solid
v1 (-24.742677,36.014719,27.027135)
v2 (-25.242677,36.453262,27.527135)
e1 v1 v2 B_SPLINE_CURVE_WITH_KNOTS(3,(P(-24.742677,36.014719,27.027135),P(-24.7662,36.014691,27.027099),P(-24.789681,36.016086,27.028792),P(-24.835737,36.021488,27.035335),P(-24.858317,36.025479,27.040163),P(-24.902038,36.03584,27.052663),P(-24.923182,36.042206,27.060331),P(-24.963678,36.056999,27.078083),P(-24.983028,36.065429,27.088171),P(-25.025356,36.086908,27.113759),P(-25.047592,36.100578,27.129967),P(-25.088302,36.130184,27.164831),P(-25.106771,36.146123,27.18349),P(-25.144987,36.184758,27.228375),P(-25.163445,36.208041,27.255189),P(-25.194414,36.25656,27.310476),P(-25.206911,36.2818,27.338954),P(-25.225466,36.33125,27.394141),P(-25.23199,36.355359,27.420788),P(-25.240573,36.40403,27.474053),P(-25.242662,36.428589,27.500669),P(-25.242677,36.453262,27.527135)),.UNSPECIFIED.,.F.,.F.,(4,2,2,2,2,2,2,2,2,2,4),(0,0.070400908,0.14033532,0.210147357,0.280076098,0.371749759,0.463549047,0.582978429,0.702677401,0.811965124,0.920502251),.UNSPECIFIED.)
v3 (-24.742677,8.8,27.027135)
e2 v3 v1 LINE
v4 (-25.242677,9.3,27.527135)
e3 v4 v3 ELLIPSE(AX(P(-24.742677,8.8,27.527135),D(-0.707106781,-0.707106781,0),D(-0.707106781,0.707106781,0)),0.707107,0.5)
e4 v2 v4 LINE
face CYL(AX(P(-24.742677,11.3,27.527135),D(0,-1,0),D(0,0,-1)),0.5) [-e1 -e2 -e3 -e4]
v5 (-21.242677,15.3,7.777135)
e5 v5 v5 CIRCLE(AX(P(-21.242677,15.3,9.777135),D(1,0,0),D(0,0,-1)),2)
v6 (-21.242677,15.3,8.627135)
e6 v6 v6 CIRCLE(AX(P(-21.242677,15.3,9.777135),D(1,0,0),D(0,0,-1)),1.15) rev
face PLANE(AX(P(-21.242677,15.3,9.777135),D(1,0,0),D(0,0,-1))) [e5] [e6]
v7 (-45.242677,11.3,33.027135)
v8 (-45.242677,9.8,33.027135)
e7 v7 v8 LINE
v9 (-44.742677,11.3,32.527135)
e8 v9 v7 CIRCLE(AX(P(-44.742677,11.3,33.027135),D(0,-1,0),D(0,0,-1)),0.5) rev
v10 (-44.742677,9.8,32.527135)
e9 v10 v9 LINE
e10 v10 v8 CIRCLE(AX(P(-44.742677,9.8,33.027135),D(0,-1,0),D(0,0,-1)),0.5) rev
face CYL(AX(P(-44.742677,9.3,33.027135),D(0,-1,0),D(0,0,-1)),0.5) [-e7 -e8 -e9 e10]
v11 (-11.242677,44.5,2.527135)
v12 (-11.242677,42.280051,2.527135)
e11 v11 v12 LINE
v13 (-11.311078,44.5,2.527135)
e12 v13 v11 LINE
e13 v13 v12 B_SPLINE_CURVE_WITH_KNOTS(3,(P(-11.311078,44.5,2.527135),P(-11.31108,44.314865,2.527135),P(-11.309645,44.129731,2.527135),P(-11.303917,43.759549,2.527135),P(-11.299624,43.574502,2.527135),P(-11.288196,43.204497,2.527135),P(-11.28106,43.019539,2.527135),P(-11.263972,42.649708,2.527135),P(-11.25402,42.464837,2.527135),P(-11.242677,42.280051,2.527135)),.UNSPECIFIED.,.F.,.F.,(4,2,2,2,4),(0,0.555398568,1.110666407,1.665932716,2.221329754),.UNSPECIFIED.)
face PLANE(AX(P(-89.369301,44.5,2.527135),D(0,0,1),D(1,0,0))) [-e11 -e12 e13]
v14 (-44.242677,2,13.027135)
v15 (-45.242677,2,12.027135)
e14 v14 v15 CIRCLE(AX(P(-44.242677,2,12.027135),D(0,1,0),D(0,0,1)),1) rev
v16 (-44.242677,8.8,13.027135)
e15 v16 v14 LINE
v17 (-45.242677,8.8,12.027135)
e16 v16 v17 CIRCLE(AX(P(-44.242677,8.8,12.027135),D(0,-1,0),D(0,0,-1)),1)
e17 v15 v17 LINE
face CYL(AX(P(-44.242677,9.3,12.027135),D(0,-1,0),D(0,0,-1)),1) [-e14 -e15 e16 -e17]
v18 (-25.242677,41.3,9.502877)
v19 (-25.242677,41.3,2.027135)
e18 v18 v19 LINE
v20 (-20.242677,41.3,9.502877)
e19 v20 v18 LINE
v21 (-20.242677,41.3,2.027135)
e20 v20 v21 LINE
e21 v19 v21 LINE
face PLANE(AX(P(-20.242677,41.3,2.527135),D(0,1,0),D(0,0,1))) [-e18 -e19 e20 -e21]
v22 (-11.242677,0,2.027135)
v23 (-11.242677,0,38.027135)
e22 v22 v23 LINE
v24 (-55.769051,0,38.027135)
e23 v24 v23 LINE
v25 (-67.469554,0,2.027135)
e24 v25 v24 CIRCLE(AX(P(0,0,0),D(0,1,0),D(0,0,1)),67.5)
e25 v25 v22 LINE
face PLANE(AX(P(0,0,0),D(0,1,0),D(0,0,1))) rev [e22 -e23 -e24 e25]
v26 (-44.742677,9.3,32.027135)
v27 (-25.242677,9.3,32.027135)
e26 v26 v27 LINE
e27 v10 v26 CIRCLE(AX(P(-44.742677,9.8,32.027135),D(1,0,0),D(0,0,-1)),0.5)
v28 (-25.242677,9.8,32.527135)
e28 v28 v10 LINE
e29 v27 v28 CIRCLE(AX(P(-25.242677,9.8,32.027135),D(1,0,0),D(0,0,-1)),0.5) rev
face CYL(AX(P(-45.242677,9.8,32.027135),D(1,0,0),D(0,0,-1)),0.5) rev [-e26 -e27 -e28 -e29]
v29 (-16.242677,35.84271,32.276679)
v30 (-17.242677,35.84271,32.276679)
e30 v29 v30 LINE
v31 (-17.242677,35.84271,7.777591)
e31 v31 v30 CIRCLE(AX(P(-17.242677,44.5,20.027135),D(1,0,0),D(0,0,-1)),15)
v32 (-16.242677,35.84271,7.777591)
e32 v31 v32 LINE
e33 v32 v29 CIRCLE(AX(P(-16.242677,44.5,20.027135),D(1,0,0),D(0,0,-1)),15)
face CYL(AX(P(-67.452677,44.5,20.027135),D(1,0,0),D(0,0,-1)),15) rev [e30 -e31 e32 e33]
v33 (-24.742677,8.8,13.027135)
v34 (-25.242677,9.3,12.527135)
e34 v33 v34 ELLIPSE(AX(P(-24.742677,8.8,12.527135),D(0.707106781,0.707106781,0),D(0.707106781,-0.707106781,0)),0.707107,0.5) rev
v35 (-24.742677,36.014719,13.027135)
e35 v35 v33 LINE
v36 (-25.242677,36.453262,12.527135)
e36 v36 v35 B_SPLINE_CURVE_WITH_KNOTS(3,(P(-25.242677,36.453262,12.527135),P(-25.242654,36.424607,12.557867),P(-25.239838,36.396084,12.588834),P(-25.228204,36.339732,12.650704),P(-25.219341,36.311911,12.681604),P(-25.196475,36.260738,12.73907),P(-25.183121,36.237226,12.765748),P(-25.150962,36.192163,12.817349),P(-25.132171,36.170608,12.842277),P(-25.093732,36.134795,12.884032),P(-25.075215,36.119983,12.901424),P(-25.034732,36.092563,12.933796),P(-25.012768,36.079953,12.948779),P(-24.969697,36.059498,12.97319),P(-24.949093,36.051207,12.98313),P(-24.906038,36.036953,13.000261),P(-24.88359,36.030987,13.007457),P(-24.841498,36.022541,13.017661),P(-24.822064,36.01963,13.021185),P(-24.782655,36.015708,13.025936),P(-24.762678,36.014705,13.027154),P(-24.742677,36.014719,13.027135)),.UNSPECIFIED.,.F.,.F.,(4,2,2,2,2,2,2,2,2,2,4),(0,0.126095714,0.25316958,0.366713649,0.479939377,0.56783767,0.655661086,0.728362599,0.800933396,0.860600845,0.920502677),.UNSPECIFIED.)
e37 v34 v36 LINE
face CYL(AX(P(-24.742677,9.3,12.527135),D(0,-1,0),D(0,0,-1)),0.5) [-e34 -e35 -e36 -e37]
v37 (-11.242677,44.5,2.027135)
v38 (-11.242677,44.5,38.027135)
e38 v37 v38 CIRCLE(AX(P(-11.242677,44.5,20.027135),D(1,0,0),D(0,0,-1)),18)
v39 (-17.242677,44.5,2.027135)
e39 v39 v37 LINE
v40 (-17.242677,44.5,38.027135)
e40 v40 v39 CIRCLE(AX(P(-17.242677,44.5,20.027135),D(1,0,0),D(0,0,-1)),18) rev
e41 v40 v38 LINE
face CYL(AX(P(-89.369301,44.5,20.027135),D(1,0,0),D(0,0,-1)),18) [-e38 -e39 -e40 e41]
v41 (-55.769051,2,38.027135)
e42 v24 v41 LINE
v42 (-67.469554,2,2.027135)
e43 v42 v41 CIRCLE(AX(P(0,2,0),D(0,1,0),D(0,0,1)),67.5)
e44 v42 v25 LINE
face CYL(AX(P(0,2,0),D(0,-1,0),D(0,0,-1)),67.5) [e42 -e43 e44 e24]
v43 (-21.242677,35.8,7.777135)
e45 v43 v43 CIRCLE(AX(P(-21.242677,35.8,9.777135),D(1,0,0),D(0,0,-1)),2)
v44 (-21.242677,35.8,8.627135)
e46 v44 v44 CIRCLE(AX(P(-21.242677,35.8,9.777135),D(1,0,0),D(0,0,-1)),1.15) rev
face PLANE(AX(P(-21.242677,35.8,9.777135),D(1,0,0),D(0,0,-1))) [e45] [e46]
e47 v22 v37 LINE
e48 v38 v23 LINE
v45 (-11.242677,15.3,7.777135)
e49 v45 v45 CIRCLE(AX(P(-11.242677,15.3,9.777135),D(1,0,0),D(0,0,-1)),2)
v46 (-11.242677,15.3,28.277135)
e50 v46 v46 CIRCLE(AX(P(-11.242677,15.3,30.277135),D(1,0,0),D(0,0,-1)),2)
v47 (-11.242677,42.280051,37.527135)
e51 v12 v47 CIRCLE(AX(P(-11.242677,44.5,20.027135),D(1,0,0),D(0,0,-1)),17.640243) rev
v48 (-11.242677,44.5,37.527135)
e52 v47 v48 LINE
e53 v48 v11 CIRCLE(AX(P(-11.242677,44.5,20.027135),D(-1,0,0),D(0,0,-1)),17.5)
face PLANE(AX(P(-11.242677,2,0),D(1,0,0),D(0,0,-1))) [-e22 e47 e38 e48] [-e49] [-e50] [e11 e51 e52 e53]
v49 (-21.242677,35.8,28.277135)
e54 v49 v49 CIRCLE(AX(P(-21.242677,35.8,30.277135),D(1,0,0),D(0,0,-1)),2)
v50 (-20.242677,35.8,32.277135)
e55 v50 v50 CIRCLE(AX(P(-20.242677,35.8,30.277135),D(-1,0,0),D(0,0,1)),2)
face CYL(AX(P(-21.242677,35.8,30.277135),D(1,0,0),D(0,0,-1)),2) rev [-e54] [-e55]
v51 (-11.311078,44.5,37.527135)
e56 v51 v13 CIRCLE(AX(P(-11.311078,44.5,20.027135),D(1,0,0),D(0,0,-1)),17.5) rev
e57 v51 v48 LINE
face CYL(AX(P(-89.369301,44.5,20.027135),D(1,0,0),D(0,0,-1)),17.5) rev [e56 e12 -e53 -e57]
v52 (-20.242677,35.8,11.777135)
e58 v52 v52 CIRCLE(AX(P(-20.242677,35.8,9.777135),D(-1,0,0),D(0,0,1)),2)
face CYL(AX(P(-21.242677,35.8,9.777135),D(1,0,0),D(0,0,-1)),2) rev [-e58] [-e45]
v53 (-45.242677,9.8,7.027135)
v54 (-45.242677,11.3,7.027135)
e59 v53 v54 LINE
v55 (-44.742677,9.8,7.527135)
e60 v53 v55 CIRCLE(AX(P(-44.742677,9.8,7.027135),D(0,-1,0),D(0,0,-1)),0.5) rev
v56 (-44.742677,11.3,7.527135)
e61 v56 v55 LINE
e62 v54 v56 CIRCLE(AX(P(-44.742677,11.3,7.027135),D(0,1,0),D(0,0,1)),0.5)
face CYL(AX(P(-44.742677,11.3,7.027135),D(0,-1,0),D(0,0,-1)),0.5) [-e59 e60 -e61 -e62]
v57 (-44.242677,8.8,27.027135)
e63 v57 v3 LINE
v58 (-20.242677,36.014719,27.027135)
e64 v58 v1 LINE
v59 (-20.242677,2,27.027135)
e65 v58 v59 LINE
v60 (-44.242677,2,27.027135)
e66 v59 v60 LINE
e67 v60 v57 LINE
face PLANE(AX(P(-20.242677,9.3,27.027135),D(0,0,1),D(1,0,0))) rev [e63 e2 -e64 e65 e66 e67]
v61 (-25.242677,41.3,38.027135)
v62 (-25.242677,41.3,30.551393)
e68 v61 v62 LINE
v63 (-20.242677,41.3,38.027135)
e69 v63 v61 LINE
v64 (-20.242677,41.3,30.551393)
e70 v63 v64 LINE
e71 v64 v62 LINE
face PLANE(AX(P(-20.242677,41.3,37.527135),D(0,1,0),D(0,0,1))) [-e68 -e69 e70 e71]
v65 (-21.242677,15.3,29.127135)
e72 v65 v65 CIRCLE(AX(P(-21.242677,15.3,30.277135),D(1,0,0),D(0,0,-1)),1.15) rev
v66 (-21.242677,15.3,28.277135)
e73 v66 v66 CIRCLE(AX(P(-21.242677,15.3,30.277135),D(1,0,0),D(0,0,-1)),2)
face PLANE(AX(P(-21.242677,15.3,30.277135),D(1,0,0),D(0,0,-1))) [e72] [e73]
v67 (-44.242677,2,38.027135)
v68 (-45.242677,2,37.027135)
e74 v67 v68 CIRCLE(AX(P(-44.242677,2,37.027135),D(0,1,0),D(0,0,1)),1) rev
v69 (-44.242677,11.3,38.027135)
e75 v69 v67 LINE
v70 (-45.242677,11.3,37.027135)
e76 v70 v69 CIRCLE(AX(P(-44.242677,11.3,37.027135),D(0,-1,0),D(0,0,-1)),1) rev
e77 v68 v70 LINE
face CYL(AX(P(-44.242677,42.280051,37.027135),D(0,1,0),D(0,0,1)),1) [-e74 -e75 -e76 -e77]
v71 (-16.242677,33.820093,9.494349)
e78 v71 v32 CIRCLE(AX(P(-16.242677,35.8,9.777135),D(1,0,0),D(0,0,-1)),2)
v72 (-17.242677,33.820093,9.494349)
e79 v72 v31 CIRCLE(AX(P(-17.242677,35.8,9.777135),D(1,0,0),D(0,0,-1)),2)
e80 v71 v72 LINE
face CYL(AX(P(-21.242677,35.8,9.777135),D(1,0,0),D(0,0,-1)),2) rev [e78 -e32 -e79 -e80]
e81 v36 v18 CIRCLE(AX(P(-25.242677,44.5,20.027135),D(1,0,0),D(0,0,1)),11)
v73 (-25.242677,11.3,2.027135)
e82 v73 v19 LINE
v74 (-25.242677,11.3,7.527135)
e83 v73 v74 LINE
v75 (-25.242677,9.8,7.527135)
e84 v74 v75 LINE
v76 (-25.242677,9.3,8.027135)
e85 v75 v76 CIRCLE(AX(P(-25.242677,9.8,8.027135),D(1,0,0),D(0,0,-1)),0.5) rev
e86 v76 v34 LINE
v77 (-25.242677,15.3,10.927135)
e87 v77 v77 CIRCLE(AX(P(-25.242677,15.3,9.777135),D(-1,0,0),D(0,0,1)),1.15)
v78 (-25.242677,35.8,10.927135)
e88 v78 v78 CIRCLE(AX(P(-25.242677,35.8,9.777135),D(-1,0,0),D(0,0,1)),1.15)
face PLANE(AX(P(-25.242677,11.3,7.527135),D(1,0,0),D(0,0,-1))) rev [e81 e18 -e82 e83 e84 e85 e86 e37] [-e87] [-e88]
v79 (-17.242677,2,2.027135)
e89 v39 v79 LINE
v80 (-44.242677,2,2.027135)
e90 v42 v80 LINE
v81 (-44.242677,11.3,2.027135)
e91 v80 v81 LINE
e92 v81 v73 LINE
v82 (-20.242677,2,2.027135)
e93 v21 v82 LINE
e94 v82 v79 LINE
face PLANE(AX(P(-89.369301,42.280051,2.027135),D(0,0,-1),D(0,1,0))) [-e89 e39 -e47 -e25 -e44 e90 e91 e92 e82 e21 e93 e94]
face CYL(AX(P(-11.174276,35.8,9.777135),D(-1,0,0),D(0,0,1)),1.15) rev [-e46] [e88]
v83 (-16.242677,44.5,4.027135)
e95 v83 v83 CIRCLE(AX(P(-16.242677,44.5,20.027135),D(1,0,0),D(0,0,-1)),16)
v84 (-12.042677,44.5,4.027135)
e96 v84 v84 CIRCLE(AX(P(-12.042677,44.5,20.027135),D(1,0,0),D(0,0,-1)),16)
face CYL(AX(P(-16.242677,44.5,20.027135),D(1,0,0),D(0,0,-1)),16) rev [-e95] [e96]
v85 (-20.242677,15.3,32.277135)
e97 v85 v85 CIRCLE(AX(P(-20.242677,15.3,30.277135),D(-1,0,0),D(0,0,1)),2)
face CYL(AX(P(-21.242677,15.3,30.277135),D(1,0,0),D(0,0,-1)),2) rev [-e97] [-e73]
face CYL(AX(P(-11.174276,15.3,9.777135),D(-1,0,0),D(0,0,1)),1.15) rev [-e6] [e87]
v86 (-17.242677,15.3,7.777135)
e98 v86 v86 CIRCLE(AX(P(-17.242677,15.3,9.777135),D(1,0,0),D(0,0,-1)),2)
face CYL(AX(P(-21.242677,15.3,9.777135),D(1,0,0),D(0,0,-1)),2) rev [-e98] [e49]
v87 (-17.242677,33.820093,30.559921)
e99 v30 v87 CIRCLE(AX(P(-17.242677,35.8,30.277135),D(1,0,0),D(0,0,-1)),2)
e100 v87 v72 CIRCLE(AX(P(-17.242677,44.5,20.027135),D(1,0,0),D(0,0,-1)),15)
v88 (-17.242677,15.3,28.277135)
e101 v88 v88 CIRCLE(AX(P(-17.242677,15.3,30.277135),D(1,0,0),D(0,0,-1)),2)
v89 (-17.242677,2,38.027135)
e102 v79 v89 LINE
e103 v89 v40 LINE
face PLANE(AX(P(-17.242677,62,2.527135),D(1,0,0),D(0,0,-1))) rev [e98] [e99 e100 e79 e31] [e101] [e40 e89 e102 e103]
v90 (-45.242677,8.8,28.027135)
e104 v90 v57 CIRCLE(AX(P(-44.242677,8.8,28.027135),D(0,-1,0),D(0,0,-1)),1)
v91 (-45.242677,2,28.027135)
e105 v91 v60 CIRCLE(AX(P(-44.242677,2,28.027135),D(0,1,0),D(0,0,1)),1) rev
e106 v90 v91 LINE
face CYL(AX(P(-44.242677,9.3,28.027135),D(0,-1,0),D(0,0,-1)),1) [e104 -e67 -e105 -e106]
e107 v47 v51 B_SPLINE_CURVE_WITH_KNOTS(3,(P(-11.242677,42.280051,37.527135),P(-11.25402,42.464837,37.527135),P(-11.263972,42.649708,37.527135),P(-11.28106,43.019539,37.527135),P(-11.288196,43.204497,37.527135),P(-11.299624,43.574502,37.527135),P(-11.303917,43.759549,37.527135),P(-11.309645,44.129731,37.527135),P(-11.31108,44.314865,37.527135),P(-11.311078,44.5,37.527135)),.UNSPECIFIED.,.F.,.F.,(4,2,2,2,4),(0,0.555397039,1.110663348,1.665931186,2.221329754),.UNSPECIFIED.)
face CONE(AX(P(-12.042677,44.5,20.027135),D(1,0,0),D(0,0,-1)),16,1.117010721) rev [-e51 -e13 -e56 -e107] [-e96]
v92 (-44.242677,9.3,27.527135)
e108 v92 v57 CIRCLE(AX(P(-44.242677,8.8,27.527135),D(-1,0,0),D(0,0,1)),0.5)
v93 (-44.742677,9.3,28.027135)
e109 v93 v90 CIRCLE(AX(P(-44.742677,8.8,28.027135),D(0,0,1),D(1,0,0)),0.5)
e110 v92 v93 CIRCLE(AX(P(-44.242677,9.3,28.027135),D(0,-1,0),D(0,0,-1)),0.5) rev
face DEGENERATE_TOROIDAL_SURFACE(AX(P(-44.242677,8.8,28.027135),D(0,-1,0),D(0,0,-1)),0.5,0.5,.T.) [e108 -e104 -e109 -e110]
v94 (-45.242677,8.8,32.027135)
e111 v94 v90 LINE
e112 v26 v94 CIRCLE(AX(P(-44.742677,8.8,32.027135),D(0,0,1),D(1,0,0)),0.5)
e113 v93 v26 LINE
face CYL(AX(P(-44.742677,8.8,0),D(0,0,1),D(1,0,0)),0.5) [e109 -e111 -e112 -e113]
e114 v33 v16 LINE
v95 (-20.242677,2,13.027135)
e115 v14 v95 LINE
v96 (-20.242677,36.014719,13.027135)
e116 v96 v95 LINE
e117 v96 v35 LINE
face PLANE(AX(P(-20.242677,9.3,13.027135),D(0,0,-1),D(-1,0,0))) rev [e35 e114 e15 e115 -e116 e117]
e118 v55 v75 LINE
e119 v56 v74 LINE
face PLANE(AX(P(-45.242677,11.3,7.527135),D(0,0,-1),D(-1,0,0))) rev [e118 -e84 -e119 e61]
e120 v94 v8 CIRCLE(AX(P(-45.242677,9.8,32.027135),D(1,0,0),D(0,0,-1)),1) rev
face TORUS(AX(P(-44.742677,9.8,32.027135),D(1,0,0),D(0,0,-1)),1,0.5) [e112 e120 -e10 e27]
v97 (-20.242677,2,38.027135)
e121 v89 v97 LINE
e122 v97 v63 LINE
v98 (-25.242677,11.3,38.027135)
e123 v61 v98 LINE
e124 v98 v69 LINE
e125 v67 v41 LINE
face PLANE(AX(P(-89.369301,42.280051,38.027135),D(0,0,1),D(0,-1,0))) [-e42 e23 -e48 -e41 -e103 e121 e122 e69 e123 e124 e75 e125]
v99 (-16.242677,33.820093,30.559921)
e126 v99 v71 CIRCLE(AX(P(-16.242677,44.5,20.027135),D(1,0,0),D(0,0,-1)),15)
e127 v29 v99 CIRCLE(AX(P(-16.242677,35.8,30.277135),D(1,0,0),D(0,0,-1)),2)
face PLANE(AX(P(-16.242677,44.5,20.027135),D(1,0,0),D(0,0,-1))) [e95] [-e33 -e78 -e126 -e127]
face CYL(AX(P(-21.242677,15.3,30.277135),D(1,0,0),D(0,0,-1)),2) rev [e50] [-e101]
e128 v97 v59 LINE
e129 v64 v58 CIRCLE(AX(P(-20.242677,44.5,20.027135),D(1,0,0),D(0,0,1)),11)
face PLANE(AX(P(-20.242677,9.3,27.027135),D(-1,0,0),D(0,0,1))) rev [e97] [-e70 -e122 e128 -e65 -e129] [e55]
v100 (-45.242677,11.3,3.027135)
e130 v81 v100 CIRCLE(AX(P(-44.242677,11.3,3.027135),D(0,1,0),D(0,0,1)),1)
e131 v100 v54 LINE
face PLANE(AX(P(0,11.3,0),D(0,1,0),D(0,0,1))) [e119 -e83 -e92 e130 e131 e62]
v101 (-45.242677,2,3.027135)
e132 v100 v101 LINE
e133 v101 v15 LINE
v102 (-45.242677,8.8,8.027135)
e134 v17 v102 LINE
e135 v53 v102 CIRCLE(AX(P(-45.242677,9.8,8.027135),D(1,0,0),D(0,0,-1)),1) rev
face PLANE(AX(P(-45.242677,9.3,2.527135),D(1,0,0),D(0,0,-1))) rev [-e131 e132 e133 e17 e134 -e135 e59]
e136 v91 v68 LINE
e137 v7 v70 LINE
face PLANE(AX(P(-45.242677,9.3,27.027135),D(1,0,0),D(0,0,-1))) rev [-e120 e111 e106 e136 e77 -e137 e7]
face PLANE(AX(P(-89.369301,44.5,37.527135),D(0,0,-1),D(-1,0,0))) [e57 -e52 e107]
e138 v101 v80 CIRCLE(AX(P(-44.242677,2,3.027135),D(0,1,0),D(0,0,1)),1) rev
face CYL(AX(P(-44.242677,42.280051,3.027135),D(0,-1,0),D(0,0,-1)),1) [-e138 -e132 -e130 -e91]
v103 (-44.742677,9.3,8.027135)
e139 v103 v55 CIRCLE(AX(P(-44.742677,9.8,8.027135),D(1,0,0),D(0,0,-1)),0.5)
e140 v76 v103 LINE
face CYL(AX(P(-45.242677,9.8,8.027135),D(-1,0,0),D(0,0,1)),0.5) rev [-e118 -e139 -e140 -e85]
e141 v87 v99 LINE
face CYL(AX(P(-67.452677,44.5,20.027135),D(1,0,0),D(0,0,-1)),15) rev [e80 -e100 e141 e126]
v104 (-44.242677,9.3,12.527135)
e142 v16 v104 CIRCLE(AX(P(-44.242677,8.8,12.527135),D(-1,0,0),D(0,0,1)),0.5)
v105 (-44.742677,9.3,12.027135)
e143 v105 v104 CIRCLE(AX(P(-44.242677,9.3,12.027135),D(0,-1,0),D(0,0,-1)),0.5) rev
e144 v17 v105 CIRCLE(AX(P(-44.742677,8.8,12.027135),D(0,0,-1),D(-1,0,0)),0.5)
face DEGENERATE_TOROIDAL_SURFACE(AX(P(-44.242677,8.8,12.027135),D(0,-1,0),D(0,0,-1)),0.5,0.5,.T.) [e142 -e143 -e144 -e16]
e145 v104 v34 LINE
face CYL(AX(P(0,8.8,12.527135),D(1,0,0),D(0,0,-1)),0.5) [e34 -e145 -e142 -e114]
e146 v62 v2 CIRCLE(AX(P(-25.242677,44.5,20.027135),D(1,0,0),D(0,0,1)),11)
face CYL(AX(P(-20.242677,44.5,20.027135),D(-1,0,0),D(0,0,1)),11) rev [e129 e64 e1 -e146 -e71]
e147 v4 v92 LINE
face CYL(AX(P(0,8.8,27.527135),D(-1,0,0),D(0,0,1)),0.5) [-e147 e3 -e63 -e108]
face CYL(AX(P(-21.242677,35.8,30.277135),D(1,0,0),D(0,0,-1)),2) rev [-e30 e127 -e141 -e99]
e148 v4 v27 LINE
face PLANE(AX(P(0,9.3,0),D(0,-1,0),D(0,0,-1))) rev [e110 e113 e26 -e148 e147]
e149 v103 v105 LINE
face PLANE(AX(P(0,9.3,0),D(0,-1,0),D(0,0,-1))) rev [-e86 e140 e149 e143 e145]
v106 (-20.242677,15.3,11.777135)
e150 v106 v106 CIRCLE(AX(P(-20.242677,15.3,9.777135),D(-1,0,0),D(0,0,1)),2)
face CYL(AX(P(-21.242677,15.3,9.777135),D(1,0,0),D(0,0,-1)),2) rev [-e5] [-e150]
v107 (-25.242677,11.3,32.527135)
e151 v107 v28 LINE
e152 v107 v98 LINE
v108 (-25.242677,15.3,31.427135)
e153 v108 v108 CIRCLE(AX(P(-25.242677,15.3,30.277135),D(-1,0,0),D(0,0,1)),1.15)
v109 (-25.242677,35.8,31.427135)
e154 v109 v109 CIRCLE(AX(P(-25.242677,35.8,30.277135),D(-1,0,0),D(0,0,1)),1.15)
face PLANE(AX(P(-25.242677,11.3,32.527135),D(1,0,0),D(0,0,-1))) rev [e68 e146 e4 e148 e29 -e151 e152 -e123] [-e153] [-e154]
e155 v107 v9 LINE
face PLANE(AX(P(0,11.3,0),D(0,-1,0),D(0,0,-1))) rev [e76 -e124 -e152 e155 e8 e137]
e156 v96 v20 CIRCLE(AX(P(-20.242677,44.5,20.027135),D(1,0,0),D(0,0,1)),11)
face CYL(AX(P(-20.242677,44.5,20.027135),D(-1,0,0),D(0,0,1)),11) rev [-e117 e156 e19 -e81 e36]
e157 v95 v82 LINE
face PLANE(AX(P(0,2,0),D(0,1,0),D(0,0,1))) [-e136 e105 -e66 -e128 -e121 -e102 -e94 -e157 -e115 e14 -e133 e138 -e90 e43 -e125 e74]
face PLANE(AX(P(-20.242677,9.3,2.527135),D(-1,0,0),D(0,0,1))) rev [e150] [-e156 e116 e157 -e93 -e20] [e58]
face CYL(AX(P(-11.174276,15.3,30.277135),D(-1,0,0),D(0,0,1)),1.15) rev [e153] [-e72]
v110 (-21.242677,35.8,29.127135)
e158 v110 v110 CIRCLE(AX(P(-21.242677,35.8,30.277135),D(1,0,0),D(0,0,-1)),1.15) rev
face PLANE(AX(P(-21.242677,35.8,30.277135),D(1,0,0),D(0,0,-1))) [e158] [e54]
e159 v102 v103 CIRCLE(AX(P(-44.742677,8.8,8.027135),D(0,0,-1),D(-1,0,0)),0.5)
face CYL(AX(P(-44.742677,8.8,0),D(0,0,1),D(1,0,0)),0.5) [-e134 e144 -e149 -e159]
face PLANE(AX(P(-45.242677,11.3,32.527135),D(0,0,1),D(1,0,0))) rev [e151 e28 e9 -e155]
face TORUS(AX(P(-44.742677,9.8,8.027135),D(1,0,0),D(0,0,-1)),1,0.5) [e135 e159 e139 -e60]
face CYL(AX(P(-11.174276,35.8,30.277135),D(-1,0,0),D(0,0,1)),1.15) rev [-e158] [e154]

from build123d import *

# Parameters (mm, degrees)
EXTRUDE_1_DEPTH     = 2
SKETCH_2_W          = 6
SKETCH_2_H          = 35
EXTRUDE_2_DEPTH     = 60
FILLET_1_R          = 17.5
SKETCH_3_R          = 16
CUT_EXTRUDE_1_DEPTH = 5
CHAMFER_1_SIZE      = 1.640243073
CHAMFER_1_SIZE_2    = 0.8
SKETCH_4_R          = 15
CUT_EXTRUDE_2_DEPTH = 105.385422037
SKETCH_5_W          = 25
SKETCH_5_H          = 10.5
EXTRUDE_3_DEPTH     = 7.3
EXTRUDE_4_DEPTH     = 2
FILLET_2_R          = 1
EXTRUDE_5_DEPTH     = 5
SKETCH_9_R          = 1.15
CUT_EXTRUDE_3_DEPTH = 101.277297201
SKETCH_10_R         = 2
CUT_EXTRUDE_4_DEPTH = 10
FILLET_3_R          = 0.5
SKETCH_12_W         = 56.21
SKETCH_12_H         = 29.03
CUT_EXTRUDE_5_DEPTH = 113.159332301
BOSS_EXTRUDE1_DEPTH = 6
BOSS_EXTRUDE2_DEPTH = 0.5
BOSS_EXTRUDE3_DEPTH = 0.5
SKETCH5_W           = 0.5
SKETCH5_H           = 2
BOSS_EXTRUDE4_DEPTH = 2
CUT_EXTRUDE1_DEPTH  = 9
SKETCH6_W           = 1
SKETCH6_H           = 9.3
BOSS_EXTRUDE5_DEPTH = 2
SKETCH7_W           = 1
SKETCH7_H           = 9.3
BOSS_EXTRUDE7_DEPTH = 3
FILLET1_R           = 1


# Some blends are built 0.0001 mm under size
with BuildPart() as part:
    # 스케치1 → 보스-돌출1 (new body)
    with BuildSketch(Plane(origin=(0, 0, 0), x_dir=(1, 0, 0), z_dir=(0, 1, 0))):
        with BuildLine():
            Line((-11.24267666, -2.527135016), (-67.45267666, -2.527135016))
            ThreePointArc((-67.45267666, -2.527135016), (-50.72671765, -44.531450868), (-11.24267666, -66.557135016))
            Line((-11.24267666, -66.557135016), (-11.24267666, -2.527135016))
        make_face()
    extrude(amount=EXTRUDE_1_DEPTH)

    # 스케치2 → 보스-돌출2 (add)
    with BuildSketch(Plane(origin=(0, 2, 0), x_dir=(1, 0, 0), z_dir=(0, 1, 0))):
        with Locations((-14.24267666, -20.027135016)):
            Rectangle(SKETCH_2_W, SKETCH_2_H)
    extrude(amount=EXTRUDE_2_DEPTH)

    # 필렛1
    fillet_1_edges = [part.edges().sort_by_distance(p)[0] for p in [
        (-14.24267666, 62, 2.527135016),
        (-14.24267666, 62, 37.527135016),
    ]]
    fillet(fillet_1_edges, radius=FILLET_1_R - 0.0001)  # a hair under: the kernel refuses the full size

    # 스케치3 → 컷-돌출1 (cut)
    with BuildSketch(Plane(origin=(-11.24267666, 0, 0), x_dir=(0, 0, -1), z_dir=(1, 0, 0))):
        with Locations((-20.027135016, 44.5)):
            Circle(SKETCH_3_R)
    extrude(amount=-CUT_EXTRUDE_1_DEPTH, mode=Mode.SUBTRACT)

    # 모따기1
    # the kernel refuses this chamfer: 1.640243073, 0.8 mm, written as the material it takes off along each edge
    with BuildSketch(Plane(origin=(-11.24267666, 44.5, 20.027135016), x_dir=(0, 0, -1), z_dir=(0, -1, 0))) as chamfer_1_piece_1:
        Polygon((16 + CHAMFER_1_SIZE, 0), (16, -CHAMFER_1_SIZE_2), (16, 0), align=None)
    revolve(axis=Axis((-11.24267666, 44.5, 20.027135016), (1, 0, 0)), mode=Mode.SUBTRACT)

    # 스케치4 → 컷-돌출2 (cut, through all)
    with BuildSketch(Plane(origin=(-16.24267666, 0, 0), x_dir=(0, 0, -1), z_dir=(1, 0, 0))):
        with Locations((-20.027135016, 44.5)):
            Circle(SKETCH_4_R)
    extrude(amount=-CUT_EXTRUDE_2_DEPTH, mode=Mode.SUBTRACT)

    # 스케치5 → 보스-돌출3 (add)
    with BuildSketch(Plane(origin=(0, 2, 0), x_dir=(1, 0, 0), z_dir=(0, 1, 0))):
        with Locations((-32.74267666, -7.777135016)):
            Rectangle(SKETCH_5_W, SKETCH_5_H)
        with Locations((-32.74267666, -32.277135016)):
            Rectangle(SKETCH_5_W, SKETCH_5_H)
    extrude(amount=EXTRUDE_3_DEPTH)

    # 스케치6 → 보스-돌출4 (add)
    with BuildSketch(Plane(origin=(0, 9.3, 0), x_dir=(1, 0, 0), z_dir=(0, 1, 0))):
        Polygon((-45.24267666, -32.527135016), (-25.24267666, -32.527135016), (-25.24267666, -27.027135016), (-20.24267666, -27.027135016), (-20.24267666, -37.527135016), (-45.24267666, -37.527135016), align=None)
        Polygon((-45.24267666, -2.527135016), (-20.24267666, -2.527135016), (-20.24267666, -13.027135016), (-25.24267666, -13.027135016), (-25.24267666, -7.527135016), (-45.24267666, -7.527135016), align=None)
    extrude(amount=EXTRUDE_4_DEPTH)

    # 필렛2
    fillet_2_edges = [part.edges().sort_by_distance(p)[0] for p in [
        (-45.24267666, 6.65, 2.527135016),
        (-45.24267666, 5.65, 13.027135016),
        (-45.24267666, 5.65, 27.027135016),
        (-45.24267666, 6.65, 37.527135016),
    ]]
    fillet(fillet_2_edges, radius=FILLET_2_R)

    # 스케치7 → 보스-돌출5 (add)
    with BuildSketch(Plane.ZY.offset(25.24267666)):
        with BuildLine():
            Line((2.527135016, 11.3), (13.027135016, 11.3))
            Line((13.027135016, 11.3), (13.027135016, 36.014718626))
            ThreePointArc((13.027135016, 36.014718626), (10.875170651, 38.397414624), (9.502877322, 41.3))
            Line((9.502877322, 41.3), (2.527135016, 41.3))
            Line((2.527135016, 41.3), (2.527135016, 11.3))
        make_face()
        with BuildLine():
            Line((37.527135016, 11.3), (27.027135016, 11.3))
            Line((27.027135016, 11.3), (27.027135016, 36.014718626))
            ThreePointArc((27.027135016, 36.014718626), (29.17909938, 38.397414624), (30.551392709, 41.3))
            Line((30.551392709, 41.3), (37.527135016, 41.3))
            Line((37.527135016, 41.3), (37.527135016, 11.3))
        make_face()
    extrude(amount=-EXTRUDE_5_DEPTH)

    # 스케치9 → 컷-돌출3 (cut, through all)
    with BuildSketch(Plane.ZY.offset(25.24267666)):
        with Locations((9.777135016, 35.8)):
            Circle(SKETCH_9_R)
        with Locations((9.777135016, 15.3)):
            Circle(SKETCH_9_R)
        with Locations((30.277135016, 15.3)):
            Circle(SKETCH_9_R)
        with Locations((30.277135016, 35.8)):
            Circle(SKETCH_9_R)
    extrude(amount=-CUT_EXTRUDE_3_DEPTH, mode=Mode.SUBTRACT)

    # 스케치10 → 컷-돌출4 (cut)
    with BuildSketch(Plane(origin=(-11.24267666, 0, 0), x_dir=(0, 0, -1), z_dir=(1, 0, 0))):
        with Locations((-30.277135016, 15.3)):
            Circle(SKETCH_10_R)
        with Locations((-9.777135016, 15.3)):
            Circle(SKETCH_10_R)
        with Locations((-9.777135016, 35.8)):
            Circle(SKETCH_10_R)
        with Locations((-30.277135016, 35.8)):
            Circle(SKETCH_10_R)
    extrude(amount=-CUT_EXTRUDE_4_DEPTH, mode=Mode.SUBTRACT)

    # 필렛3
    fillet_3_edges = [part.edges().sort_by_distance(p)[0] for p in [
        (-45.24267666, 10.3, 32.527135016),
        (-25.24267666, 22.657359313, 27.027135016),
        (-35.24267666, 9.3, 32.527135016),
        (-45.24267666, 9.3, 30.277135016),
        (-44.949783441, 9.3, 27.320028235),
        (-34.74267666, 9.3, 13.027135016),
        (-44.949783441, 9.3, 12.734241797),
        (-45.24267666, 9.3, 9.777135016),
        (-35.24267666, 9.3, 7.527135016),
        (-45.24267666, 10.3, 7.527135016),
        (-25.24267666, 22.657359313, 13.027135016),
        (-34.74267666, 9.3, 27.027135016),
    ]]
    fillet(fillet_3_edges, radius=FILLET_3_R)

    # 스케치12 → 컷-돌출5 (cut, through all)
    with BuildSketch(Plane(origin=(0, 2, 0), x_dir=(1, 0, 0), z_dir=(0, 1, 0))):
        with Locations((-39.34767666, -52.042135016)):
            Rectangle(SKETCH_12_W, SKETCH_12_H)
    extrude(amount=-CUT_EXTRUDE_5_DEPTH, mode=Mode.SUBTRACT)

    # Sketch1 → Boss-Extrude1 (add)
    with BuildSketch(Plane(origin=(-11.24267666, 0, 0), x_dir=(0, 0, -1), z_dir=(1, 0, 0))):
        with BuildLine():
            Line((-38.027135016, 42.280050522), (-38.027135016, 0))
            Line((-38.027135016, 0), (-37.527135016, 0))
            Line((-37.527135016, 0), (-37.527135016, 44.5))
            ThreePointArc((-37.527135016, 44.5), (-32.401503687, 56.874368671), (-20.027135016, 62))
            ThreePointArc((-20.027135016, 62), (-7.652766345, 56.874368671), (-2.527135016, 44.5))
            Line((-2.527135016, 44.5), (-2.527135016, 0))
            Line((-2.527135016, 0), (-2.027135016, 0))
            Line((-2.027135016, 0), (-2.027135016, 42.280050522))
            Line((-2.027135016, 42.280050522), (-2.027135016, 44.5))
            ThreePointArc((-2.027135016, 44.5), (-7.299212954, 57.227922061), (-20.027135016, 62.5))
            ThreePointArc((-20.027135016, 62.5), (-32.755057077, 57.227922061), (-38.027135016, 44.5))
            Line((-38.027135016, 44.5), (-38.027135016, 42.280050522))
        make_face()
    extrude(amount=-BOSS_EXTRUDE1_DEPTH)

    # Sketch2 → Boss-Extrude2 (add)
    with BuildSketch(Plane(origin=(0, 0, 2.527135016), x_dir=(-1, 0, 0), z_dir=(0, 0, -1))):
        Polygon((17.24267666, 2), (17.24267666, 0), (67.45267666, 0), (67.45267666, 2), (44.24267666, 2), (44.24267666, 11.3), (25.24267666, 11.3), (25.24267666, 41.3), (20.24267666, 41.3), (20.24267666, 2), align=None)
    extrude(amount=BOSS_EXTRUDE2_DEPTH)

    # Sketch3 → Boss-Extrude3 (add)
    with BuildSketch(Plane.XY.offset(37.527135016)):
        Polygon((-17.24267666, 0), (-17.24267666, 2), (-20.24267666, 2), (-20.24267666, 41.3), (-25.24267666, 41.3), (-25.24267666, 11.3), (-44.24267666, 11.3), (-44.24267666, 2), (-56.106720966, 2), (-56.106720966, 0), align=None)
    extrude(amount=BOSS_EXTRUDE3_DEPTH)

    # Sketch5 → Boss-Extrude4 (add)
    with BuildSketch(Plane.ZY.offset(67.45267666)):
        with Locations((2.277135016, 1)):
            Rectangle(SKETCH5_W, SKETCH5_H)
    extrude(amount=BOSS_EXTRUDE4_DEPTH)

    # Sketch4 → Cut-Extrude1 (cut)
    with BuildSketch(Plane.XZ):
        with BuildLine():
            Line((-67.498191683, 0.494084527), (-93.58337569, -4.753226021))
            Line((-93.58337569, -4.753226021), (-77.452778633, 44.072890783))
            Line((-77.452778633, 44.072890783), (-53.718589474, 40.872523105))
            ThreePointArc((-53.718589474, 40.872523105), (-63.882560875, 21.800651733), (-67.498191683, 0.494084527))
        make_face()
    extrude(amount=-CUT_EXTRUDE1_DEPTH, mode=Mode.SUBTRACT)

    # Sketch6 → Boss-Extrude5 (add)
    with BuildSketch(Plane.XY.offset(38.027135016)):
        with Locations((-44.74267666, 6.65)):
            Rectangle(SKETCH6_W, SKETCH6_H)
    extrude(amount=-BOSS_EXTRUDE5_DEPTH)

    # Sketch7 → Boss-Extrude7 (add)
    with BuildSketch(Plane(origin=(0, 0, 2.027135016), x_dir=(-1, 0, 0), z_dir=(0, 0, -1))):
        with Locations((44.74267666, 6.65)):
            Rectangle(SKETCH7_W, SKETCH7_H)
    extrude(amount=-BOSS_EXTRUDE7_DEPTH)

    # Fillet1
    fillet1_edges = [part.edges().sort_by_distance(p)[0] for p in [
        (-45.24267666, 6.65, 38.027135016),
        (-45.24267666, 6.65, 2.027135016),
    ]]
    fillet(fillet1_edges, radius=FILLET1_R)


solid = part.part
